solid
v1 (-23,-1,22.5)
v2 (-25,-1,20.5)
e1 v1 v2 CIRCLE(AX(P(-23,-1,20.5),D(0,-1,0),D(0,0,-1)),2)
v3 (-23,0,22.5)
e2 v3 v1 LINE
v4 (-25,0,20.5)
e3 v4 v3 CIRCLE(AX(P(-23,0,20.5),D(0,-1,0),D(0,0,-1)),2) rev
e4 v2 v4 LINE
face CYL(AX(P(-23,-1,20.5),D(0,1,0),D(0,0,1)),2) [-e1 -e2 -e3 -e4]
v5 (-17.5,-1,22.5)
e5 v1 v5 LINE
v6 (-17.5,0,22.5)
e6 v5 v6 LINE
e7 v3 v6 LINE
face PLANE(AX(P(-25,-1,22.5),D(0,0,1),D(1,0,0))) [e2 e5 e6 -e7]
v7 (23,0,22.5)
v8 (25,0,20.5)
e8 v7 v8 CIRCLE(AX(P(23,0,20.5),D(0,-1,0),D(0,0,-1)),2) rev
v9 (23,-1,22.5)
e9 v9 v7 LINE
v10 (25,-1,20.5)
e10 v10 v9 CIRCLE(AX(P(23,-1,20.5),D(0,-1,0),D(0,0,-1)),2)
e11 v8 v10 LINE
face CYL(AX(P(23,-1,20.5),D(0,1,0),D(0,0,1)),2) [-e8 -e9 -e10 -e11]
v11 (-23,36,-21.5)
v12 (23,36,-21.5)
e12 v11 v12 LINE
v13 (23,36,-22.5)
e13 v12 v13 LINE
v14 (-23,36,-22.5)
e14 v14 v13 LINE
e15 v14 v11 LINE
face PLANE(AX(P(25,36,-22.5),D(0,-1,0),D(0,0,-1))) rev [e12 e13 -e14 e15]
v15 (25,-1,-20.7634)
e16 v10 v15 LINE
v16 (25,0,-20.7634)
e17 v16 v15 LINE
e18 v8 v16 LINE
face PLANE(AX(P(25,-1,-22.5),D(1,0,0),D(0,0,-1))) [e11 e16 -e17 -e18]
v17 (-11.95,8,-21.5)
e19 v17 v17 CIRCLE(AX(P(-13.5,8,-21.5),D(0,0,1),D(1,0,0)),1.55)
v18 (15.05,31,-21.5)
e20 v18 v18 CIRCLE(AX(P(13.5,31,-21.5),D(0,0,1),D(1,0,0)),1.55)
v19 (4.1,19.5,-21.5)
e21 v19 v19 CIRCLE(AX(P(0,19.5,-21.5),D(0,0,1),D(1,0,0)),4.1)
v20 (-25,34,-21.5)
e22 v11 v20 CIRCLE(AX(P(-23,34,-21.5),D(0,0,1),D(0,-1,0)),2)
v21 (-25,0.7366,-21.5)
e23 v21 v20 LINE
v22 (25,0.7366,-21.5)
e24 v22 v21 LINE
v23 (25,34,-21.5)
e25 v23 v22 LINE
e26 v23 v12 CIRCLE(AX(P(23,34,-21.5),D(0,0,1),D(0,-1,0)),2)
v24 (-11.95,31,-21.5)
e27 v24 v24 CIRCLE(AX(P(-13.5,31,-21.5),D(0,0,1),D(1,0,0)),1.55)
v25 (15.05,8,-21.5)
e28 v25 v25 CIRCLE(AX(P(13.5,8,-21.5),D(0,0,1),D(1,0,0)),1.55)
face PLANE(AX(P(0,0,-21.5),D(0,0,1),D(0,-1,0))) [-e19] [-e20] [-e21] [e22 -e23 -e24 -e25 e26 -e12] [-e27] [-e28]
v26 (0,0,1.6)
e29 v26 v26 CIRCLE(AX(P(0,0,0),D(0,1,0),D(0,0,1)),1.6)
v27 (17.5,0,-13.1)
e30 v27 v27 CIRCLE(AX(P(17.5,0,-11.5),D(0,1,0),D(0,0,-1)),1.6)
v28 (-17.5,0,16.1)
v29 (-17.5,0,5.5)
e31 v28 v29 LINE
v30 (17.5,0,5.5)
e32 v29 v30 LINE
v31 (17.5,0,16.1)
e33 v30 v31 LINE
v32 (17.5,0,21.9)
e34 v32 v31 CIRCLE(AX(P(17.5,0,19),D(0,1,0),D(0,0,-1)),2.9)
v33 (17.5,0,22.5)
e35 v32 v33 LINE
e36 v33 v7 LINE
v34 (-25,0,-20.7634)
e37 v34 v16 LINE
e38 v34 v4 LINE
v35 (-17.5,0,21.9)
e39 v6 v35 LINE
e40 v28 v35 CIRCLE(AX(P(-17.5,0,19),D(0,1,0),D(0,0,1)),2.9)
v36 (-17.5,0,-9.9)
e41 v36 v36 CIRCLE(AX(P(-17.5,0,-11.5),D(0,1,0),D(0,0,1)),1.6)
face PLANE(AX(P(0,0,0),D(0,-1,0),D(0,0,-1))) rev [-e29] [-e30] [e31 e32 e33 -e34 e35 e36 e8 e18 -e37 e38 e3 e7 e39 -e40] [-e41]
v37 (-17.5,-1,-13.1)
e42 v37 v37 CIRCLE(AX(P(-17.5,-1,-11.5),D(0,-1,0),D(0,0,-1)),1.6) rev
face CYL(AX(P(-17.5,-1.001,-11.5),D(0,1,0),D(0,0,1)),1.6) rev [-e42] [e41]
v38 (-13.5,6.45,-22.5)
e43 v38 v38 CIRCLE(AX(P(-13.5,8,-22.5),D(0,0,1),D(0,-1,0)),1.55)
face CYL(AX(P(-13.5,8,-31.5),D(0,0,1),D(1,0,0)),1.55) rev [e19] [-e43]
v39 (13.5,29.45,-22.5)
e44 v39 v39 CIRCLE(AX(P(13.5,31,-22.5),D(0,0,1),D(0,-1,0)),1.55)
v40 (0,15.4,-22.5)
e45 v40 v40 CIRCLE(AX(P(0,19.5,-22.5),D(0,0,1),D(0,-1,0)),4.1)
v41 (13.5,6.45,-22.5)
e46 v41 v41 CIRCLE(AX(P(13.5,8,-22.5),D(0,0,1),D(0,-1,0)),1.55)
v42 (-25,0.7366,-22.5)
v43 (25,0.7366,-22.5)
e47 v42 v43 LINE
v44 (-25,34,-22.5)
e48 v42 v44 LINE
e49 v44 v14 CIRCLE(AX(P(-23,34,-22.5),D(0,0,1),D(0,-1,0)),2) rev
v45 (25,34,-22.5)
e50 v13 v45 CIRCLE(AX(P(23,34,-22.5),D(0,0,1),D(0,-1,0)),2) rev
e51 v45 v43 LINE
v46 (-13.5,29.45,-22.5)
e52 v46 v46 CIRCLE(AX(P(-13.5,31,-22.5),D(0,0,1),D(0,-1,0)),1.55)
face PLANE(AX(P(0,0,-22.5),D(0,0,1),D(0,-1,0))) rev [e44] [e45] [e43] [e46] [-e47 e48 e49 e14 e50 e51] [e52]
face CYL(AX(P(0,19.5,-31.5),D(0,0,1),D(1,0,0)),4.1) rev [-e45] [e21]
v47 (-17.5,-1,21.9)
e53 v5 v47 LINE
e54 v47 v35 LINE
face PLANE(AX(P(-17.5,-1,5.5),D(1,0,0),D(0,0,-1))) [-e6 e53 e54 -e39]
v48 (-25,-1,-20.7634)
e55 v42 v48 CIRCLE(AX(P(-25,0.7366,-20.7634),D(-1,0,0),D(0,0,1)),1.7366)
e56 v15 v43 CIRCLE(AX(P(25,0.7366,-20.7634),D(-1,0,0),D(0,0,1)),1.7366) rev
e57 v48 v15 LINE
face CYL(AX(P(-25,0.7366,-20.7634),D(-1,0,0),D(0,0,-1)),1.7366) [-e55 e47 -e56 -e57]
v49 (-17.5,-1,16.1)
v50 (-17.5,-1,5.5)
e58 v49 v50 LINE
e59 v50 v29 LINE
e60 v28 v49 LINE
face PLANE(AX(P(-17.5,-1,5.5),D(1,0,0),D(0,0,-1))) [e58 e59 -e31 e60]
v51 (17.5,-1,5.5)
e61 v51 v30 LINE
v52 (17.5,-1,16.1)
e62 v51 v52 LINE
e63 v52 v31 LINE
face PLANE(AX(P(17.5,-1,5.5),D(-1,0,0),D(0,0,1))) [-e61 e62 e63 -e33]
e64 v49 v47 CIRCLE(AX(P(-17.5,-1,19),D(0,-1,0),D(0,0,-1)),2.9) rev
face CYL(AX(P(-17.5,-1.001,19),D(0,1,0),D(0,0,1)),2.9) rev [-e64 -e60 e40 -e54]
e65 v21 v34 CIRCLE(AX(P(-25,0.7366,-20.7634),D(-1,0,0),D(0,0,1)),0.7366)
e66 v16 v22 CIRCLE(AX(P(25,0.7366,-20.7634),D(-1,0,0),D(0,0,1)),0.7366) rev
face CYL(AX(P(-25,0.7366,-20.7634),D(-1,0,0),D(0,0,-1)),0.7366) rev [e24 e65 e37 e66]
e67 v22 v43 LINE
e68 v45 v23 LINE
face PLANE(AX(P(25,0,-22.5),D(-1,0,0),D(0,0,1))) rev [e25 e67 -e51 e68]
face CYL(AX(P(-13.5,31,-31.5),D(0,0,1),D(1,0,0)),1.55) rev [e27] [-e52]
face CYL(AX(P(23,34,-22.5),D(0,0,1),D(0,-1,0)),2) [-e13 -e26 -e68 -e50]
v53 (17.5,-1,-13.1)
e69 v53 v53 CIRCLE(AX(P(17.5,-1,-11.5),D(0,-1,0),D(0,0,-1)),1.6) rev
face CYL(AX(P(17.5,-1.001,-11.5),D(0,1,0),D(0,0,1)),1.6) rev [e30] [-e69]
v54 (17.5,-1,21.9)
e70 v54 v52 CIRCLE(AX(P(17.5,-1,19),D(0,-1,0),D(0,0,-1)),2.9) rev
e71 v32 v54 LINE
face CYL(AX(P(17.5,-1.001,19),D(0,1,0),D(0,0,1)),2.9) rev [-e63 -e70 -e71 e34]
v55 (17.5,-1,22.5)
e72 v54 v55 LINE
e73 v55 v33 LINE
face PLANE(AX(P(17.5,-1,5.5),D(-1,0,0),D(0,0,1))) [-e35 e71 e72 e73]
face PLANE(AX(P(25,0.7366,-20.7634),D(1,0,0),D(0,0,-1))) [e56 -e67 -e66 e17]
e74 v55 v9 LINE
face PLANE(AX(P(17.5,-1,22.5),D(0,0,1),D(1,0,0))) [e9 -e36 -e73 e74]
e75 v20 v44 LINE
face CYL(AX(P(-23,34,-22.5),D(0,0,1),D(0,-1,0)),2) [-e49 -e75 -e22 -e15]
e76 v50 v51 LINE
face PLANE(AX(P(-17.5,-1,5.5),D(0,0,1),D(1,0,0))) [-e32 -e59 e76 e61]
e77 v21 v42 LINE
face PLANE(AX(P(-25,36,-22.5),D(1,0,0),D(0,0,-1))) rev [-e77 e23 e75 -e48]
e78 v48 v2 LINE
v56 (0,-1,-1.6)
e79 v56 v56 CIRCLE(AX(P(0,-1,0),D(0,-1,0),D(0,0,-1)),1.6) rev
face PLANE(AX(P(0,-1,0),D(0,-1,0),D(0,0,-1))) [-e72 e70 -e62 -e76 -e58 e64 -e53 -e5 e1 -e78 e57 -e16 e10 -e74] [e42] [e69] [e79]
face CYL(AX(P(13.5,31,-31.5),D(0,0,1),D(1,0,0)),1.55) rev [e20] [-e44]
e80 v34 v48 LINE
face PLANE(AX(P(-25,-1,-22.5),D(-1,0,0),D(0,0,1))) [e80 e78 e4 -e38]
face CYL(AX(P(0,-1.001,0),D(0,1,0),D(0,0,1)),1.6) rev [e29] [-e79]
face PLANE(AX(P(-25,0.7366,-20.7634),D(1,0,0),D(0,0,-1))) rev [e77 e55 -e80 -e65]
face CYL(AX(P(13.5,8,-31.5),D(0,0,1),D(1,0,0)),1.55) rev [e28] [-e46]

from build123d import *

# Parameters (mm, degrees)
SM_BASE_FLANGE_1_DEPTH           = 1
SM_EDGE_FLANGE_2_STRIP_W         = 5.4732
SM_EDGE_FLANGE_2_STRIP_H         = 1
SM_EDGE_FLANGE_2_STRIP_CUT_DEPTH = 50
SM_EDGE_FLANGE_2_DEPTH           = 50
SKETCH_10_R                      = 1.55
SKETCH_10_R_2                    = 4.1
CUT_EXTRUDE_7_DEPTH              = 10
CUT_EXTRUDE_6_REACH              = 51.267
SKETCH_19_R                      = 2.9
SKETCH_19_R_2                    = 1.6
FILLET_2_R                       = 2


# Sheet-metal steps are written as plain solids
with BuildPart() as part:
    # Sketch 2 → 基体-法兰1 (new body)
    with BuildSketch(Plane(origin=(0, 0, 0), x_dir=(1, 0, 0), z_dir=(0, 1, 0))):
        Polygon((-17.5, -5.5), (17.5, -5.5), (17.5, -22.5), (25, -22.5), (25, 22.5), (-25, 22.5), (-25, -22.5), (-17.5, -22.5), align=None)
    extrude(amount=-SM_BASE_FLANGE_1_DEPTH)

    # 边线-法兰2 strip (across the edge) → 边线-法兰2 strip cut (cut)
    with BuildSketch(Plane(origin=(25, 0, -22.5), x_dir=(0, 0, 1), z_dir=(-1, 0, 0))):
        with Locations((-1, -0.5)):
            Rectangle(SM_EDGE_FLANGE_2_STRIP_W, SM_EDGE_FLANGE_2_STRIP_H)
    extrude(amount=SM_EDGE_FLANGE_2_STRIP_CUT_DEPTH, mode=Mode.SUBTRACT)

    # 边线-法兰2 section (across the edge) → 边线-法兰2 (add)
    with BuildSketch(Plane(origin=(25, 0, -22.5), x_dir=(0, 0, 1), z_dir=(-1, 0, 0))):
        with BuildLine():
            Line((0, 0.7366), (0, 36))
            Line((0, 36), (1, 36))
            Line((1, 36), (1, 0.7366))
            ThreePointArc((1, 0.7366), (1.215745145, 0.215745145), (1.7366, 0))
            Line((1.7366, 0), (1.7366, -1))
            ThreePointArc((1.7366, -1), (0.508638364, -0.491361636), (0, 0.7366))
        make_face()
    extrude(amount=SM_EDGE_FLANGE_2_DEPTH)

    # 草图10 → 切除-拉伸7 (cut)
    with BuildSketch(Plane.XY.offset(-21.5)):
        with Locations((-13.5, 31)):
            Circle(SKETCH_10_R)
        with Locations((13.5, 31)):
            Circle(SKETCH_10_R)
        with Locations((13.5, 8)):
            Circle(SKETCH_10_R)
        with Locations((-13.5, 8)):
            Circle(SKETCH_10_R)
        with Locations((0, 19.5)):
            Circle(SKETCH_10_R_2)
    extrude(amount=-CUT_EXTRUDE_7_DEPTH, mode=Mode.SUBTRACT)

    # 草图19 → 切除-拉伸6 (cut, up to next)
    with BuildSketch(Plane(origin=(0, 0, 0), x_dir=(1, 0, 0), z_dir=(0, 1, 0)), mode=Mode.PRIVATE) as cut_extrude_6_sk1:
        with Locations((-17.5, -19)):
            Circle(SKETCH_19_R)
    cut_extrude_6_tool1 = extrude(cut_extrude_6_sk1.sketch, amount=-CUT_EXTRUDE_6_REACH, mode=Mode.PRIVATE) & part.part
    # 草图19 → 切除-拉伸6 (cut, up to next)
    with BuildSketch(Plane(origin=(0, 0, 0), x_dir=(1, 0, 0), z_dir=(0, 1, 0)), mode=Mode.PRIVATE) as cut_extrude_6_sk2:
        with Locations((17.5, -19)):
            Circle(SKETCH_19_R)
    cut_extrude_6_tool2 = extrude(cut_extrude_6_sk2.sketch, amount=-CUT_EXTRUDE_6_REACH, mode=Mode.PRIVATE) & part.part
    # 草图19 → 切除-拉伸6 (cut, up to next)
    with BuildSketch(Plane(origin=(0, 0, 0), x_dir=(1, 0, 0), z_dir=(0, 1, 0)), mode=Mode.PRIVATE) as cut_extrude_6_sk3:
        with Locations(Location((-17.5, 11.5, 0), (0, 0, 270))):
            Circle(SKETCH_19_R_2)
    cut_extrude_6_tool3 = extrude(cut_extrude_6_sk3.sketch, amount=-CUT_EXTRUDE_6_REACH, mode=Mode.PRIVATE) & part.part
    # 草图19 → 切除-拉伸6 (cut, up to next)
    with BuildSketch(Plane(origin=(0, 0, 0), x_dir=(1, 0, 0), z_dir=(0, 1, 0)), mode=Mode.PRIVATE) as cut_extrude_6_sk4:
        with Locations(Location((17.5, 11.5, 0), (0, 0, 90))):
            Circle(SKETCH_19_R_2)
    cut_extrude_6_tool4 = extrude(cut_extrude_6_sk4.sketch, amount=-CUT_EXTRUDE_6_REACH, mode=Mode.PRIVATE) & part.part
    # 草图19 → 切除-拉伸6 (cut, up to next)
    with BuildSketch(Plane(origin=(0, 0, 0), x_dir=(1, 0, 0), z_dir=(0, 1, 0)), mode=Mode.PRIVATE) as cut_extrude_6_sk5:
        with Locations(Location((0, 0, 0), (0, 0, 270))):
            Circle(SKETCH_19_R_2)
    cut_extrude_6_tool5 = extrude(cut_extrude_6_sk5.sketch, amount=-CUT_EXTRUDE_6_REACH, mode=Mode.PRIVATE) & part.part
    add(cut_extrude_6_tool1.solids().sort_by_distance((-17.5, 0, 19))[0], mode=Mode.SUBTRACT)
    add(cut_extrude_6_tool2.solids().sort_by_distance((17.5, 0, 19))[0], mode=Mode.SUBTRACT)
    add(cut_extrude_6_tool3.solids().sort_by_distance((-17.5, 0, -11.5))[0], mode=Mode.SUBTRACT)
    add(cut_extrude_6_tool4.solids().sort_by_distance((17.5, 0, -11.5))[0], mode=Mode.SUBTRACT)
    add(cut_extrude_6_tool5.solids().sort_by_distance((0, 0, 0))[0], mode=Mode.SUBTRACT)

    # 圆角2
    fillet_2_edges = [part.edges().sort_by_distance(p)[0] for p in [
        (-25, -0.5, 22.5),
        (25, -0.5, 22.5),
        (25, 36, -22),
        (-25, 36, -22),
    ]]
    fillet(fillet_2_edges, radius=FILLET_2_R)


solid = part.part
